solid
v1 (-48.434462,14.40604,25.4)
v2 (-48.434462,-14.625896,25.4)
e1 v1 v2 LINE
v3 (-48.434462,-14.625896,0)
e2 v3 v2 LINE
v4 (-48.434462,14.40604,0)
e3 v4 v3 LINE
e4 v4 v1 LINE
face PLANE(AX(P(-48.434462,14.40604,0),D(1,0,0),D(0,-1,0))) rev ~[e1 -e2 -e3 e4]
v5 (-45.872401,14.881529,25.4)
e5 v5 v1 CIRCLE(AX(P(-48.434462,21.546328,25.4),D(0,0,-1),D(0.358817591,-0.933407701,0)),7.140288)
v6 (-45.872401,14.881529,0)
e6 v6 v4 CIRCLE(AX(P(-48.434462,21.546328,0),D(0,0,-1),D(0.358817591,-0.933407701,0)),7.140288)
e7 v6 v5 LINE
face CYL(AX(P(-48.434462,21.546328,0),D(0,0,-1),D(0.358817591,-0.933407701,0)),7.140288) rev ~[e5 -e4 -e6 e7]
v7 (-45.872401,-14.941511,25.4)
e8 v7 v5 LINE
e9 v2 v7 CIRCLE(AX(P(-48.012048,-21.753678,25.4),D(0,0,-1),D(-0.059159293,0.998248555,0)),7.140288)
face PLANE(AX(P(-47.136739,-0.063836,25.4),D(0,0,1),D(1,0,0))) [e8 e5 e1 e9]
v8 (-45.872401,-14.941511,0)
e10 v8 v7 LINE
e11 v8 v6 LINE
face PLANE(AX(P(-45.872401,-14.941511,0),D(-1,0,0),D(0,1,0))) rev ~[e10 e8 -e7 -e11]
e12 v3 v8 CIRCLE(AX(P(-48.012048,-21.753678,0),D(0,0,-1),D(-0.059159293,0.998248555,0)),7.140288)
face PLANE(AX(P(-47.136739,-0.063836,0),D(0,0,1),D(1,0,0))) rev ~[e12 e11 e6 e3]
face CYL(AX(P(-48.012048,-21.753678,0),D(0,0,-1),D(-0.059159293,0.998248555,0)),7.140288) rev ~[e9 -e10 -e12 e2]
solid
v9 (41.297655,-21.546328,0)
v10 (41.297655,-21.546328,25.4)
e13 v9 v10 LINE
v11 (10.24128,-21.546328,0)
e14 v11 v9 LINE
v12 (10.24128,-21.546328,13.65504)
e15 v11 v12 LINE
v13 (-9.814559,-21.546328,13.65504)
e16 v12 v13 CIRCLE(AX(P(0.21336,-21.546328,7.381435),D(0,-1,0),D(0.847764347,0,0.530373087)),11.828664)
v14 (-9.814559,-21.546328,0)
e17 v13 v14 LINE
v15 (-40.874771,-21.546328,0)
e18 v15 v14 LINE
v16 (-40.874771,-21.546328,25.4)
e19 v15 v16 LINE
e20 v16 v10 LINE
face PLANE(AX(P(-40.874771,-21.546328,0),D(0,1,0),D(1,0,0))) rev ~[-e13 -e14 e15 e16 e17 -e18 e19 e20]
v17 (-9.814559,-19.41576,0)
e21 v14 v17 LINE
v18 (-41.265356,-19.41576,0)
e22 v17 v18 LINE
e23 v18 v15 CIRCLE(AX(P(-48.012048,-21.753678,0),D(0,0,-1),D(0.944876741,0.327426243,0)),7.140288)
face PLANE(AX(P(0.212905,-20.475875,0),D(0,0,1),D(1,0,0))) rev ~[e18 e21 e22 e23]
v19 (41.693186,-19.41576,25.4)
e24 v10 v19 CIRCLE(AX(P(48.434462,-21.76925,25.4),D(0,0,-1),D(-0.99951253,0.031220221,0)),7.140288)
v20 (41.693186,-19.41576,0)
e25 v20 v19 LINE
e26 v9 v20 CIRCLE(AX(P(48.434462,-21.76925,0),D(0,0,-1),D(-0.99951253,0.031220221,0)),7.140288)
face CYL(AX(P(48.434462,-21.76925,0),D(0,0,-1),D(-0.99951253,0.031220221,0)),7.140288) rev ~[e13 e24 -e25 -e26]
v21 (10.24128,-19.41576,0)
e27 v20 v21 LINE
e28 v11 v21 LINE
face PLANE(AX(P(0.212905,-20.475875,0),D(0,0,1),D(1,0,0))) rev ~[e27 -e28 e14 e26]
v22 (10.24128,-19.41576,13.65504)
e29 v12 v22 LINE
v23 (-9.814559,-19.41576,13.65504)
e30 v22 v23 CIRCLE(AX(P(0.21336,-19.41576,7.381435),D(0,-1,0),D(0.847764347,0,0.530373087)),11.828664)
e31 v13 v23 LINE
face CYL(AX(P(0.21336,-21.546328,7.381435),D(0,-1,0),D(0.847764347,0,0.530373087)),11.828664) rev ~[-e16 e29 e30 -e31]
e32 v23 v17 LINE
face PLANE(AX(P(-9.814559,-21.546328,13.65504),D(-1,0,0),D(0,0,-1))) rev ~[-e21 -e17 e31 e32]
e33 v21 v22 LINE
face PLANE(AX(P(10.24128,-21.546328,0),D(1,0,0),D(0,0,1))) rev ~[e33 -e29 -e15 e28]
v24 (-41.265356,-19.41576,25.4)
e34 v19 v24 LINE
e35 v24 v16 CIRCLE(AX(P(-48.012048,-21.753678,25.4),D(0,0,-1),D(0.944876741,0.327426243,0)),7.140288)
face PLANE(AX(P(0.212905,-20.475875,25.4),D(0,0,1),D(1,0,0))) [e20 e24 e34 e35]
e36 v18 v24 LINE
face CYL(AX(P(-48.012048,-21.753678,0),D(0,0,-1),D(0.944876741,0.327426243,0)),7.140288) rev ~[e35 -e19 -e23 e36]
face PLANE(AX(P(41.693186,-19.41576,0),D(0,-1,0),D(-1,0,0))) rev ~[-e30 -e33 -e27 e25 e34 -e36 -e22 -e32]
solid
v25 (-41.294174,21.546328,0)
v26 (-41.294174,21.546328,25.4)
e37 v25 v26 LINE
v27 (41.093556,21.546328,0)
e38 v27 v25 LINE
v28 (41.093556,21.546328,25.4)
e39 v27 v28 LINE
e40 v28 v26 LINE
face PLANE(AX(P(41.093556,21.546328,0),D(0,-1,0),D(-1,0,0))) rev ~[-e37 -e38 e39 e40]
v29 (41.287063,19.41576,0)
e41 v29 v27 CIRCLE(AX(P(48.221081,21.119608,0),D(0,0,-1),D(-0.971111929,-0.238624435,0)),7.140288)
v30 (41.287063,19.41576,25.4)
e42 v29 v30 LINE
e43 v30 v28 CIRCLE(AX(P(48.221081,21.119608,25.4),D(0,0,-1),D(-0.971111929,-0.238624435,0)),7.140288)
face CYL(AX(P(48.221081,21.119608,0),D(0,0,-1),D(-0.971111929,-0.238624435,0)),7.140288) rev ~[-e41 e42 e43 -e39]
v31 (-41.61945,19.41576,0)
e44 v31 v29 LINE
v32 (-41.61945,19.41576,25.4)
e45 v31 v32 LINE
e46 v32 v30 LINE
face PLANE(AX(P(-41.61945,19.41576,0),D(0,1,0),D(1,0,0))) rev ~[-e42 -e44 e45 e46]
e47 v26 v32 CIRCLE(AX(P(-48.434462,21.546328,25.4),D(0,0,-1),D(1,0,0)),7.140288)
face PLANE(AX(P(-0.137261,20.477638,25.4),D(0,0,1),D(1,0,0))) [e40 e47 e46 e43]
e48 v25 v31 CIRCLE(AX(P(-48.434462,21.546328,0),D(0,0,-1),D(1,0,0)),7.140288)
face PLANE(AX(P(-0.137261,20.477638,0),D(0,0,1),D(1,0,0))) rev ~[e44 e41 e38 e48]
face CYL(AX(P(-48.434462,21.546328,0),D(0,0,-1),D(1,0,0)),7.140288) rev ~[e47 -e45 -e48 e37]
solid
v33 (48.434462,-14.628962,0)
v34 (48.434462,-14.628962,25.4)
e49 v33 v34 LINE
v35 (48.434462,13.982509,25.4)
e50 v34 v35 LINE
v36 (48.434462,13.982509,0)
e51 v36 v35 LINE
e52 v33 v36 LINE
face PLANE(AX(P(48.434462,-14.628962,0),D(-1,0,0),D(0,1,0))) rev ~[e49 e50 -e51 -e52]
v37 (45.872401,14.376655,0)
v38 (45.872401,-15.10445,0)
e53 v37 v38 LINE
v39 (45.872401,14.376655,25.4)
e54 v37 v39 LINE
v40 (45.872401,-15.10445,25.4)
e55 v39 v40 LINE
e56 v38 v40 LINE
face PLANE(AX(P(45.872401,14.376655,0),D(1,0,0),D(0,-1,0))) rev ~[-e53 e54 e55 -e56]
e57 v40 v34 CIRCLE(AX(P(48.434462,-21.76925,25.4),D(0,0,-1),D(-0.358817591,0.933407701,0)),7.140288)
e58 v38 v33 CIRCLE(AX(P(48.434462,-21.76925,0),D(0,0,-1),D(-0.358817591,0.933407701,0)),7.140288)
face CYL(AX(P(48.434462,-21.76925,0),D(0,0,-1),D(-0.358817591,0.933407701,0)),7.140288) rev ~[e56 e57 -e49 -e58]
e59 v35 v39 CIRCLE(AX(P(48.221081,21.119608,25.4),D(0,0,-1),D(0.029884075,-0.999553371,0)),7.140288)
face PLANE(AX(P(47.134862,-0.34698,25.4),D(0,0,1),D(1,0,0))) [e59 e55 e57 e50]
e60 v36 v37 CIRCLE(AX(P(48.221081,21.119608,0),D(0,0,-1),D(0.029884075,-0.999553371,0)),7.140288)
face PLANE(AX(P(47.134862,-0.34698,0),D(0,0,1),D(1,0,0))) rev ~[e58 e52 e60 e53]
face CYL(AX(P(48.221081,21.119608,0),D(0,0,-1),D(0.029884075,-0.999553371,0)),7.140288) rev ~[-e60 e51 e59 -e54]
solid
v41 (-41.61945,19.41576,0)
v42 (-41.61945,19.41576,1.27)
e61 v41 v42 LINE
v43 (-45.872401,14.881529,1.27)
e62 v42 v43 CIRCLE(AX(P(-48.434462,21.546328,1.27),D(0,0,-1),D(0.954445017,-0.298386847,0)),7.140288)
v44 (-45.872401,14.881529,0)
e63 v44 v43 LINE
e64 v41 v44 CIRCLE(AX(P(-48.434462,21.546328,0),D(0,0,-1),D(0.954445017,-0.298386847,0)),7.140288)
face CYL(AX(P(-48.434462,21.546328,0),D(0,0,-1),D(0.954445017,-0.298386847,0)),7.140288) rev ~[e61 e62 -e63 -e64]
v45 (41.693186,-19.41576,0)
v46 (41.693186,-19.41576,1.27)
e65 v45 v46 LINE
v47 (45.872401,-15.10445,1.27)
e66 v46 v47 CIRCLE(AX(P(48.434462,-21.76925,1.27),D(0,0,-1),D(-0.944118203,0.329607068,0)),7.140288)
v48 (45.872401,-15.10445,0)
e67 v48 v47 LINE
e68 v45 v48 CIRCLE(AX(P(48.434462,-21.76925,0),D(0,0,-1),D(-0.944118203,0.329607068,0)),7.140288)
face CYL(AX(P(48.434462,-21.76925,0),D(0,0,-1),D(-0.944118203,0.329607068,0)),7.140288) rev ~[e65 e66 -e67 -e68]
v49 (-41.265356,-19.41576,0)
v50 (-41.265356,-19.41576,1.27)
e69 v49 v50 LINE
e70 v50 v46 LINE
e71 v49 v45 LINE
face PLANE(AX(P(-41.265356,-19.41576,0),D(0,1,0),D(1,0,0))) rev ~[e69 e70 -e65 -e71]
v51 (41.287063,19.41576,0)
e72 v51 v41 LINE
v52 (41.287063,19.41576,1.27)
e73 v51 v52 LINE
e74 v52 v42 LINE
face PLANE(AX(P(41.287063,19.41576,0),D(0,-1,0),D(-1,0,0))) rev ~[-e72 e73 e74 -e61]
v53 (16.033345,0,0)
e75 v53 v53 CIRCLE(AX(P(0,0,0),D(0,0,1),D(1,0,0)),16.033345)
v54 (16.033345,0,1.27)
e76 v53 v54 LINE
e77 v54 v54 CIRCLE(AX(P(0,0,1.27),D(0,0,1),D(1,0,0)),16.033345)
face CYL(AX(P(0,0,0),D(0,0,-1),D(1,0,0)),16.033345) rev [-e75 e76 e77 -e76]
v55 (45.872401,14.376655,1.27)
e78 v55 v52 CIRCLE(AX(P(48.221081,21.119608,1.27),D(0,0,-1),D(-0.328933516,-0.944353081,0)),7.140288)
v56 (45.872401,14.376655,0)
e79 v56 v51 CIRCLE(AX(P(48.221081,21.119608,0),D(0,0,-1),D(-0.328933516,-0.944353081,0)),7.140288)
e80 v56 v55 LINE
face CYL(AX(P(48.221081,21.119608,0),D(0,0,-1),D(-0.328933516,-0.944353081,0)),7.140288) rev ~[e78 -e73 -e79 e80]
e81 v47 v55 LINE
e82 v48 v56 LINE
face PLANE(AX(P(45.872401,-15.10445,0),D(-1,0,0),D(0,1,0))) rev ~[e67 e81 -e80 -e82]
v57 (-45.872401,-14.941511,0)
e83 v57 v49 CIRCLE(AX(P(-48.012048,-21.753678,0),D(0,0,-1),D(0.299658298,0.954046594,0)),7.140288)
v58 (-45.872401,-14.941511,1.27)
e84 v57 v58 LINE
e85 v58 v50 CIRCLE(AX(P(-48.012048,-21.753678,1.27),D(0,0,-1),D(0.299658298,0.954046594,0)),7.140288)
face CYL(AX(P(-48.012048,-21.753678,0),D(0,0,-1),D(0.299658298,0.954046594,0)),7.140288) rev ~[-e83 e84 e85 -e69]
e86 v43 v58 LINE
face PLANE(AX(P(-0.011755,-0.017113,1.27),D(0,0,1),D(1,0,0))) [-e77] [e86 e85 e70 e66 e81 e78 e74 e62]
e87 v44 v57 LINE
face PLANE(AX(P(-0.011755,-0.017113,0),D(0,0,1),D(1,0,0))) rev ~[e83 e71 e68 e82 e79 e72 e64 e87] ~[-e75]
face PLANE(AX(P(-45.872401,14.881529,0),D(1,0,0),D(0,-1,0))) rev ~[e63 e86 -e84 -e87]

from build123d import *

# Parameters (mm, degrees)
F1_DEPTH = 25.4
F4_DEPTH = 2.286
F0_R     = 16.0333450032
F6_DEPTH = 1.27


# Not quite as in the source:
# - the program builds the solid bodies; features that only make, move or delete a surface that nothing else refers to are left out


with BuildPart() as f1:
    # F0 (on Top) → F1 (new body)
    with BuildSketch(Plane.XY):
        with BuildLine():
            ThreePointArc((41.2870626156, 19.4157604128), (41.1100626555, 20.4737561097), (41.0935558069, 21.5463284403))
            Line((41.0935558069, 21.5463284403), (-41.2941743717, 21.5463284403))
            ThreePointArc((-41.2941743717, 21.5463284403), (-41.3759617074, 20.468700907), (-41.6194500738, 19.4157604128))
            Line((-41.6194500738, 19.4157604128), (41.2870626156, 19.4157604128))
        make_face()
    extrude(amount=F1_DEPTH)


with BuildPart() as f1b:
    # F0 (on Top) → F1, piece 2 (new body)
    with BuildSketch(Plane.XY):
        with BuildLine():
            ThreePointArc((-45.8724014461, 14.8815286098), (-47.1315574375, 14.5259187823), (-48.4344623983, 14.4060404137))
            Line((-48.4344623983, 14.4060404137), (-48.4344623983, -14.6258958917))
            ThreePointArc((-48.4344623983, -14.6258958917), (-47.1390504435, -14.6669589449), (-45.8724014461, -14.9415106237))
            Line((-45.8724014461, -14.9415106237), (-45.8724014461, 14.8815286098))
        make_face()
    extrude(amount=F1_DEPTH)


with BuildPart() as f1c:
    # F0 (on Top) → F1, piece 3 (new body)
    with BuildSketch(Plane.XY):
        with BuildLine():
            ThreePointArc((41.2976550473, -21.5463284403), (41.4141256039, -20.4659523028), (41.6931864989, -19.4157604128))
            Line((41.6931864989, -19.4157604128), (-41.2653559278, -19.4157604128))
            ThreePointArc((-41.2653559278, -19.4157604128), (-40.9888024923, -20.4661473001), (-40.8747712689, -21.5463284403))
            Line((-40.8747712689, -21.5463284403), (41.2976550473, -21.5463284403))
        make_face()
    extrude(amount=F1_DEPTH)

    # F3 (on face) → F4 (cut)
    with BuildSketch(Plane.XZ.offset(21.5463284403)):
        with BuildLine():
            Line((-9.814559482, 13.6550404131), (-9.814559482, 0))
            Line((-9.814559482, 0), (10.2412803099, 0))
            Line((10.2412803099, 0), (10.2412803099, 13.6550404131))
            ThreePointArc((10.2412803099, 13.6550404131), (0.2133604139, 19.2100995282), (-9.814559482, 13.6550404131))
        make_face()
    extrude(amount=-F4_DEPTH, mode=Mode.SUBTRACT)


with BuildPart() as f1d:
    # F0 (on Top) → F1, piece 4 (new body)
    with BuildSketch(Plane.XY):
        with BuildLine():
            Line((48.4344623983, -14.6289617851), (48.4344623983, 13.9825086435))
            ThreePointArc((48.4344623983, 13.9825086435), (47.135395826, 14.0623418721), (45.8724014461, 14.3766546148))
            Line((45.8724014461, 14.3766546148), (45.8724014461, -15.1044499813))
            ThreePointArc((45.8724014461, -15.1044499813), (47.1315574375, -14.7488401538), (48.4344623983, -14.6289617851))
        make_face()
    extrude(amount=F1_DEPTH)


with BuildPart() as f6:
    # F0 (on Top) → F6 (new body)
    with BuildSketch(Plane.XY):
        with BuildLine():
            ThreePointArc((45.8724014461, 14.3766546148), (42.9399574045, 16.31404402), (41.2870626156, 19.4157604128))
            Line((41.2870626156, 19.4157604128), (-41.6194500738, 19.4157604128))
            ThreePointArc((-41.6194500738, 19.4157604128), (-43.2265654792, 16.6615026724), (-45.8724014461, 14.8815286098))
            Line((-45.8724014461, 14.8815286098), (-45.8724014461, -14.9415106237))
            ThreePointArc((-45.8724014461, -14.9415106237), (-43.0374644665, -16.6314489243), (-41.2653559278, -19.4157604128))
            Line((-41.2653559278, -19.4157604128), (41.6931864989, -19.4157604128))
            ThreePointArc((41.6931864989, -19.4157604128), (43.3075853222, -16.7994566018), (45.8724014461, -15.1044499813))
            Line((45.8724014461, -15.1044499813), (45.8724014461, 14.3766546148))
        make_face()
        Circle(F0_R, mode=Mode.SUBTRACT)
    extrude(amount=F6_DEPTH)


solid = Compound([f1.part, f1b.part, f1c.part, f1d.part, f6.part])
